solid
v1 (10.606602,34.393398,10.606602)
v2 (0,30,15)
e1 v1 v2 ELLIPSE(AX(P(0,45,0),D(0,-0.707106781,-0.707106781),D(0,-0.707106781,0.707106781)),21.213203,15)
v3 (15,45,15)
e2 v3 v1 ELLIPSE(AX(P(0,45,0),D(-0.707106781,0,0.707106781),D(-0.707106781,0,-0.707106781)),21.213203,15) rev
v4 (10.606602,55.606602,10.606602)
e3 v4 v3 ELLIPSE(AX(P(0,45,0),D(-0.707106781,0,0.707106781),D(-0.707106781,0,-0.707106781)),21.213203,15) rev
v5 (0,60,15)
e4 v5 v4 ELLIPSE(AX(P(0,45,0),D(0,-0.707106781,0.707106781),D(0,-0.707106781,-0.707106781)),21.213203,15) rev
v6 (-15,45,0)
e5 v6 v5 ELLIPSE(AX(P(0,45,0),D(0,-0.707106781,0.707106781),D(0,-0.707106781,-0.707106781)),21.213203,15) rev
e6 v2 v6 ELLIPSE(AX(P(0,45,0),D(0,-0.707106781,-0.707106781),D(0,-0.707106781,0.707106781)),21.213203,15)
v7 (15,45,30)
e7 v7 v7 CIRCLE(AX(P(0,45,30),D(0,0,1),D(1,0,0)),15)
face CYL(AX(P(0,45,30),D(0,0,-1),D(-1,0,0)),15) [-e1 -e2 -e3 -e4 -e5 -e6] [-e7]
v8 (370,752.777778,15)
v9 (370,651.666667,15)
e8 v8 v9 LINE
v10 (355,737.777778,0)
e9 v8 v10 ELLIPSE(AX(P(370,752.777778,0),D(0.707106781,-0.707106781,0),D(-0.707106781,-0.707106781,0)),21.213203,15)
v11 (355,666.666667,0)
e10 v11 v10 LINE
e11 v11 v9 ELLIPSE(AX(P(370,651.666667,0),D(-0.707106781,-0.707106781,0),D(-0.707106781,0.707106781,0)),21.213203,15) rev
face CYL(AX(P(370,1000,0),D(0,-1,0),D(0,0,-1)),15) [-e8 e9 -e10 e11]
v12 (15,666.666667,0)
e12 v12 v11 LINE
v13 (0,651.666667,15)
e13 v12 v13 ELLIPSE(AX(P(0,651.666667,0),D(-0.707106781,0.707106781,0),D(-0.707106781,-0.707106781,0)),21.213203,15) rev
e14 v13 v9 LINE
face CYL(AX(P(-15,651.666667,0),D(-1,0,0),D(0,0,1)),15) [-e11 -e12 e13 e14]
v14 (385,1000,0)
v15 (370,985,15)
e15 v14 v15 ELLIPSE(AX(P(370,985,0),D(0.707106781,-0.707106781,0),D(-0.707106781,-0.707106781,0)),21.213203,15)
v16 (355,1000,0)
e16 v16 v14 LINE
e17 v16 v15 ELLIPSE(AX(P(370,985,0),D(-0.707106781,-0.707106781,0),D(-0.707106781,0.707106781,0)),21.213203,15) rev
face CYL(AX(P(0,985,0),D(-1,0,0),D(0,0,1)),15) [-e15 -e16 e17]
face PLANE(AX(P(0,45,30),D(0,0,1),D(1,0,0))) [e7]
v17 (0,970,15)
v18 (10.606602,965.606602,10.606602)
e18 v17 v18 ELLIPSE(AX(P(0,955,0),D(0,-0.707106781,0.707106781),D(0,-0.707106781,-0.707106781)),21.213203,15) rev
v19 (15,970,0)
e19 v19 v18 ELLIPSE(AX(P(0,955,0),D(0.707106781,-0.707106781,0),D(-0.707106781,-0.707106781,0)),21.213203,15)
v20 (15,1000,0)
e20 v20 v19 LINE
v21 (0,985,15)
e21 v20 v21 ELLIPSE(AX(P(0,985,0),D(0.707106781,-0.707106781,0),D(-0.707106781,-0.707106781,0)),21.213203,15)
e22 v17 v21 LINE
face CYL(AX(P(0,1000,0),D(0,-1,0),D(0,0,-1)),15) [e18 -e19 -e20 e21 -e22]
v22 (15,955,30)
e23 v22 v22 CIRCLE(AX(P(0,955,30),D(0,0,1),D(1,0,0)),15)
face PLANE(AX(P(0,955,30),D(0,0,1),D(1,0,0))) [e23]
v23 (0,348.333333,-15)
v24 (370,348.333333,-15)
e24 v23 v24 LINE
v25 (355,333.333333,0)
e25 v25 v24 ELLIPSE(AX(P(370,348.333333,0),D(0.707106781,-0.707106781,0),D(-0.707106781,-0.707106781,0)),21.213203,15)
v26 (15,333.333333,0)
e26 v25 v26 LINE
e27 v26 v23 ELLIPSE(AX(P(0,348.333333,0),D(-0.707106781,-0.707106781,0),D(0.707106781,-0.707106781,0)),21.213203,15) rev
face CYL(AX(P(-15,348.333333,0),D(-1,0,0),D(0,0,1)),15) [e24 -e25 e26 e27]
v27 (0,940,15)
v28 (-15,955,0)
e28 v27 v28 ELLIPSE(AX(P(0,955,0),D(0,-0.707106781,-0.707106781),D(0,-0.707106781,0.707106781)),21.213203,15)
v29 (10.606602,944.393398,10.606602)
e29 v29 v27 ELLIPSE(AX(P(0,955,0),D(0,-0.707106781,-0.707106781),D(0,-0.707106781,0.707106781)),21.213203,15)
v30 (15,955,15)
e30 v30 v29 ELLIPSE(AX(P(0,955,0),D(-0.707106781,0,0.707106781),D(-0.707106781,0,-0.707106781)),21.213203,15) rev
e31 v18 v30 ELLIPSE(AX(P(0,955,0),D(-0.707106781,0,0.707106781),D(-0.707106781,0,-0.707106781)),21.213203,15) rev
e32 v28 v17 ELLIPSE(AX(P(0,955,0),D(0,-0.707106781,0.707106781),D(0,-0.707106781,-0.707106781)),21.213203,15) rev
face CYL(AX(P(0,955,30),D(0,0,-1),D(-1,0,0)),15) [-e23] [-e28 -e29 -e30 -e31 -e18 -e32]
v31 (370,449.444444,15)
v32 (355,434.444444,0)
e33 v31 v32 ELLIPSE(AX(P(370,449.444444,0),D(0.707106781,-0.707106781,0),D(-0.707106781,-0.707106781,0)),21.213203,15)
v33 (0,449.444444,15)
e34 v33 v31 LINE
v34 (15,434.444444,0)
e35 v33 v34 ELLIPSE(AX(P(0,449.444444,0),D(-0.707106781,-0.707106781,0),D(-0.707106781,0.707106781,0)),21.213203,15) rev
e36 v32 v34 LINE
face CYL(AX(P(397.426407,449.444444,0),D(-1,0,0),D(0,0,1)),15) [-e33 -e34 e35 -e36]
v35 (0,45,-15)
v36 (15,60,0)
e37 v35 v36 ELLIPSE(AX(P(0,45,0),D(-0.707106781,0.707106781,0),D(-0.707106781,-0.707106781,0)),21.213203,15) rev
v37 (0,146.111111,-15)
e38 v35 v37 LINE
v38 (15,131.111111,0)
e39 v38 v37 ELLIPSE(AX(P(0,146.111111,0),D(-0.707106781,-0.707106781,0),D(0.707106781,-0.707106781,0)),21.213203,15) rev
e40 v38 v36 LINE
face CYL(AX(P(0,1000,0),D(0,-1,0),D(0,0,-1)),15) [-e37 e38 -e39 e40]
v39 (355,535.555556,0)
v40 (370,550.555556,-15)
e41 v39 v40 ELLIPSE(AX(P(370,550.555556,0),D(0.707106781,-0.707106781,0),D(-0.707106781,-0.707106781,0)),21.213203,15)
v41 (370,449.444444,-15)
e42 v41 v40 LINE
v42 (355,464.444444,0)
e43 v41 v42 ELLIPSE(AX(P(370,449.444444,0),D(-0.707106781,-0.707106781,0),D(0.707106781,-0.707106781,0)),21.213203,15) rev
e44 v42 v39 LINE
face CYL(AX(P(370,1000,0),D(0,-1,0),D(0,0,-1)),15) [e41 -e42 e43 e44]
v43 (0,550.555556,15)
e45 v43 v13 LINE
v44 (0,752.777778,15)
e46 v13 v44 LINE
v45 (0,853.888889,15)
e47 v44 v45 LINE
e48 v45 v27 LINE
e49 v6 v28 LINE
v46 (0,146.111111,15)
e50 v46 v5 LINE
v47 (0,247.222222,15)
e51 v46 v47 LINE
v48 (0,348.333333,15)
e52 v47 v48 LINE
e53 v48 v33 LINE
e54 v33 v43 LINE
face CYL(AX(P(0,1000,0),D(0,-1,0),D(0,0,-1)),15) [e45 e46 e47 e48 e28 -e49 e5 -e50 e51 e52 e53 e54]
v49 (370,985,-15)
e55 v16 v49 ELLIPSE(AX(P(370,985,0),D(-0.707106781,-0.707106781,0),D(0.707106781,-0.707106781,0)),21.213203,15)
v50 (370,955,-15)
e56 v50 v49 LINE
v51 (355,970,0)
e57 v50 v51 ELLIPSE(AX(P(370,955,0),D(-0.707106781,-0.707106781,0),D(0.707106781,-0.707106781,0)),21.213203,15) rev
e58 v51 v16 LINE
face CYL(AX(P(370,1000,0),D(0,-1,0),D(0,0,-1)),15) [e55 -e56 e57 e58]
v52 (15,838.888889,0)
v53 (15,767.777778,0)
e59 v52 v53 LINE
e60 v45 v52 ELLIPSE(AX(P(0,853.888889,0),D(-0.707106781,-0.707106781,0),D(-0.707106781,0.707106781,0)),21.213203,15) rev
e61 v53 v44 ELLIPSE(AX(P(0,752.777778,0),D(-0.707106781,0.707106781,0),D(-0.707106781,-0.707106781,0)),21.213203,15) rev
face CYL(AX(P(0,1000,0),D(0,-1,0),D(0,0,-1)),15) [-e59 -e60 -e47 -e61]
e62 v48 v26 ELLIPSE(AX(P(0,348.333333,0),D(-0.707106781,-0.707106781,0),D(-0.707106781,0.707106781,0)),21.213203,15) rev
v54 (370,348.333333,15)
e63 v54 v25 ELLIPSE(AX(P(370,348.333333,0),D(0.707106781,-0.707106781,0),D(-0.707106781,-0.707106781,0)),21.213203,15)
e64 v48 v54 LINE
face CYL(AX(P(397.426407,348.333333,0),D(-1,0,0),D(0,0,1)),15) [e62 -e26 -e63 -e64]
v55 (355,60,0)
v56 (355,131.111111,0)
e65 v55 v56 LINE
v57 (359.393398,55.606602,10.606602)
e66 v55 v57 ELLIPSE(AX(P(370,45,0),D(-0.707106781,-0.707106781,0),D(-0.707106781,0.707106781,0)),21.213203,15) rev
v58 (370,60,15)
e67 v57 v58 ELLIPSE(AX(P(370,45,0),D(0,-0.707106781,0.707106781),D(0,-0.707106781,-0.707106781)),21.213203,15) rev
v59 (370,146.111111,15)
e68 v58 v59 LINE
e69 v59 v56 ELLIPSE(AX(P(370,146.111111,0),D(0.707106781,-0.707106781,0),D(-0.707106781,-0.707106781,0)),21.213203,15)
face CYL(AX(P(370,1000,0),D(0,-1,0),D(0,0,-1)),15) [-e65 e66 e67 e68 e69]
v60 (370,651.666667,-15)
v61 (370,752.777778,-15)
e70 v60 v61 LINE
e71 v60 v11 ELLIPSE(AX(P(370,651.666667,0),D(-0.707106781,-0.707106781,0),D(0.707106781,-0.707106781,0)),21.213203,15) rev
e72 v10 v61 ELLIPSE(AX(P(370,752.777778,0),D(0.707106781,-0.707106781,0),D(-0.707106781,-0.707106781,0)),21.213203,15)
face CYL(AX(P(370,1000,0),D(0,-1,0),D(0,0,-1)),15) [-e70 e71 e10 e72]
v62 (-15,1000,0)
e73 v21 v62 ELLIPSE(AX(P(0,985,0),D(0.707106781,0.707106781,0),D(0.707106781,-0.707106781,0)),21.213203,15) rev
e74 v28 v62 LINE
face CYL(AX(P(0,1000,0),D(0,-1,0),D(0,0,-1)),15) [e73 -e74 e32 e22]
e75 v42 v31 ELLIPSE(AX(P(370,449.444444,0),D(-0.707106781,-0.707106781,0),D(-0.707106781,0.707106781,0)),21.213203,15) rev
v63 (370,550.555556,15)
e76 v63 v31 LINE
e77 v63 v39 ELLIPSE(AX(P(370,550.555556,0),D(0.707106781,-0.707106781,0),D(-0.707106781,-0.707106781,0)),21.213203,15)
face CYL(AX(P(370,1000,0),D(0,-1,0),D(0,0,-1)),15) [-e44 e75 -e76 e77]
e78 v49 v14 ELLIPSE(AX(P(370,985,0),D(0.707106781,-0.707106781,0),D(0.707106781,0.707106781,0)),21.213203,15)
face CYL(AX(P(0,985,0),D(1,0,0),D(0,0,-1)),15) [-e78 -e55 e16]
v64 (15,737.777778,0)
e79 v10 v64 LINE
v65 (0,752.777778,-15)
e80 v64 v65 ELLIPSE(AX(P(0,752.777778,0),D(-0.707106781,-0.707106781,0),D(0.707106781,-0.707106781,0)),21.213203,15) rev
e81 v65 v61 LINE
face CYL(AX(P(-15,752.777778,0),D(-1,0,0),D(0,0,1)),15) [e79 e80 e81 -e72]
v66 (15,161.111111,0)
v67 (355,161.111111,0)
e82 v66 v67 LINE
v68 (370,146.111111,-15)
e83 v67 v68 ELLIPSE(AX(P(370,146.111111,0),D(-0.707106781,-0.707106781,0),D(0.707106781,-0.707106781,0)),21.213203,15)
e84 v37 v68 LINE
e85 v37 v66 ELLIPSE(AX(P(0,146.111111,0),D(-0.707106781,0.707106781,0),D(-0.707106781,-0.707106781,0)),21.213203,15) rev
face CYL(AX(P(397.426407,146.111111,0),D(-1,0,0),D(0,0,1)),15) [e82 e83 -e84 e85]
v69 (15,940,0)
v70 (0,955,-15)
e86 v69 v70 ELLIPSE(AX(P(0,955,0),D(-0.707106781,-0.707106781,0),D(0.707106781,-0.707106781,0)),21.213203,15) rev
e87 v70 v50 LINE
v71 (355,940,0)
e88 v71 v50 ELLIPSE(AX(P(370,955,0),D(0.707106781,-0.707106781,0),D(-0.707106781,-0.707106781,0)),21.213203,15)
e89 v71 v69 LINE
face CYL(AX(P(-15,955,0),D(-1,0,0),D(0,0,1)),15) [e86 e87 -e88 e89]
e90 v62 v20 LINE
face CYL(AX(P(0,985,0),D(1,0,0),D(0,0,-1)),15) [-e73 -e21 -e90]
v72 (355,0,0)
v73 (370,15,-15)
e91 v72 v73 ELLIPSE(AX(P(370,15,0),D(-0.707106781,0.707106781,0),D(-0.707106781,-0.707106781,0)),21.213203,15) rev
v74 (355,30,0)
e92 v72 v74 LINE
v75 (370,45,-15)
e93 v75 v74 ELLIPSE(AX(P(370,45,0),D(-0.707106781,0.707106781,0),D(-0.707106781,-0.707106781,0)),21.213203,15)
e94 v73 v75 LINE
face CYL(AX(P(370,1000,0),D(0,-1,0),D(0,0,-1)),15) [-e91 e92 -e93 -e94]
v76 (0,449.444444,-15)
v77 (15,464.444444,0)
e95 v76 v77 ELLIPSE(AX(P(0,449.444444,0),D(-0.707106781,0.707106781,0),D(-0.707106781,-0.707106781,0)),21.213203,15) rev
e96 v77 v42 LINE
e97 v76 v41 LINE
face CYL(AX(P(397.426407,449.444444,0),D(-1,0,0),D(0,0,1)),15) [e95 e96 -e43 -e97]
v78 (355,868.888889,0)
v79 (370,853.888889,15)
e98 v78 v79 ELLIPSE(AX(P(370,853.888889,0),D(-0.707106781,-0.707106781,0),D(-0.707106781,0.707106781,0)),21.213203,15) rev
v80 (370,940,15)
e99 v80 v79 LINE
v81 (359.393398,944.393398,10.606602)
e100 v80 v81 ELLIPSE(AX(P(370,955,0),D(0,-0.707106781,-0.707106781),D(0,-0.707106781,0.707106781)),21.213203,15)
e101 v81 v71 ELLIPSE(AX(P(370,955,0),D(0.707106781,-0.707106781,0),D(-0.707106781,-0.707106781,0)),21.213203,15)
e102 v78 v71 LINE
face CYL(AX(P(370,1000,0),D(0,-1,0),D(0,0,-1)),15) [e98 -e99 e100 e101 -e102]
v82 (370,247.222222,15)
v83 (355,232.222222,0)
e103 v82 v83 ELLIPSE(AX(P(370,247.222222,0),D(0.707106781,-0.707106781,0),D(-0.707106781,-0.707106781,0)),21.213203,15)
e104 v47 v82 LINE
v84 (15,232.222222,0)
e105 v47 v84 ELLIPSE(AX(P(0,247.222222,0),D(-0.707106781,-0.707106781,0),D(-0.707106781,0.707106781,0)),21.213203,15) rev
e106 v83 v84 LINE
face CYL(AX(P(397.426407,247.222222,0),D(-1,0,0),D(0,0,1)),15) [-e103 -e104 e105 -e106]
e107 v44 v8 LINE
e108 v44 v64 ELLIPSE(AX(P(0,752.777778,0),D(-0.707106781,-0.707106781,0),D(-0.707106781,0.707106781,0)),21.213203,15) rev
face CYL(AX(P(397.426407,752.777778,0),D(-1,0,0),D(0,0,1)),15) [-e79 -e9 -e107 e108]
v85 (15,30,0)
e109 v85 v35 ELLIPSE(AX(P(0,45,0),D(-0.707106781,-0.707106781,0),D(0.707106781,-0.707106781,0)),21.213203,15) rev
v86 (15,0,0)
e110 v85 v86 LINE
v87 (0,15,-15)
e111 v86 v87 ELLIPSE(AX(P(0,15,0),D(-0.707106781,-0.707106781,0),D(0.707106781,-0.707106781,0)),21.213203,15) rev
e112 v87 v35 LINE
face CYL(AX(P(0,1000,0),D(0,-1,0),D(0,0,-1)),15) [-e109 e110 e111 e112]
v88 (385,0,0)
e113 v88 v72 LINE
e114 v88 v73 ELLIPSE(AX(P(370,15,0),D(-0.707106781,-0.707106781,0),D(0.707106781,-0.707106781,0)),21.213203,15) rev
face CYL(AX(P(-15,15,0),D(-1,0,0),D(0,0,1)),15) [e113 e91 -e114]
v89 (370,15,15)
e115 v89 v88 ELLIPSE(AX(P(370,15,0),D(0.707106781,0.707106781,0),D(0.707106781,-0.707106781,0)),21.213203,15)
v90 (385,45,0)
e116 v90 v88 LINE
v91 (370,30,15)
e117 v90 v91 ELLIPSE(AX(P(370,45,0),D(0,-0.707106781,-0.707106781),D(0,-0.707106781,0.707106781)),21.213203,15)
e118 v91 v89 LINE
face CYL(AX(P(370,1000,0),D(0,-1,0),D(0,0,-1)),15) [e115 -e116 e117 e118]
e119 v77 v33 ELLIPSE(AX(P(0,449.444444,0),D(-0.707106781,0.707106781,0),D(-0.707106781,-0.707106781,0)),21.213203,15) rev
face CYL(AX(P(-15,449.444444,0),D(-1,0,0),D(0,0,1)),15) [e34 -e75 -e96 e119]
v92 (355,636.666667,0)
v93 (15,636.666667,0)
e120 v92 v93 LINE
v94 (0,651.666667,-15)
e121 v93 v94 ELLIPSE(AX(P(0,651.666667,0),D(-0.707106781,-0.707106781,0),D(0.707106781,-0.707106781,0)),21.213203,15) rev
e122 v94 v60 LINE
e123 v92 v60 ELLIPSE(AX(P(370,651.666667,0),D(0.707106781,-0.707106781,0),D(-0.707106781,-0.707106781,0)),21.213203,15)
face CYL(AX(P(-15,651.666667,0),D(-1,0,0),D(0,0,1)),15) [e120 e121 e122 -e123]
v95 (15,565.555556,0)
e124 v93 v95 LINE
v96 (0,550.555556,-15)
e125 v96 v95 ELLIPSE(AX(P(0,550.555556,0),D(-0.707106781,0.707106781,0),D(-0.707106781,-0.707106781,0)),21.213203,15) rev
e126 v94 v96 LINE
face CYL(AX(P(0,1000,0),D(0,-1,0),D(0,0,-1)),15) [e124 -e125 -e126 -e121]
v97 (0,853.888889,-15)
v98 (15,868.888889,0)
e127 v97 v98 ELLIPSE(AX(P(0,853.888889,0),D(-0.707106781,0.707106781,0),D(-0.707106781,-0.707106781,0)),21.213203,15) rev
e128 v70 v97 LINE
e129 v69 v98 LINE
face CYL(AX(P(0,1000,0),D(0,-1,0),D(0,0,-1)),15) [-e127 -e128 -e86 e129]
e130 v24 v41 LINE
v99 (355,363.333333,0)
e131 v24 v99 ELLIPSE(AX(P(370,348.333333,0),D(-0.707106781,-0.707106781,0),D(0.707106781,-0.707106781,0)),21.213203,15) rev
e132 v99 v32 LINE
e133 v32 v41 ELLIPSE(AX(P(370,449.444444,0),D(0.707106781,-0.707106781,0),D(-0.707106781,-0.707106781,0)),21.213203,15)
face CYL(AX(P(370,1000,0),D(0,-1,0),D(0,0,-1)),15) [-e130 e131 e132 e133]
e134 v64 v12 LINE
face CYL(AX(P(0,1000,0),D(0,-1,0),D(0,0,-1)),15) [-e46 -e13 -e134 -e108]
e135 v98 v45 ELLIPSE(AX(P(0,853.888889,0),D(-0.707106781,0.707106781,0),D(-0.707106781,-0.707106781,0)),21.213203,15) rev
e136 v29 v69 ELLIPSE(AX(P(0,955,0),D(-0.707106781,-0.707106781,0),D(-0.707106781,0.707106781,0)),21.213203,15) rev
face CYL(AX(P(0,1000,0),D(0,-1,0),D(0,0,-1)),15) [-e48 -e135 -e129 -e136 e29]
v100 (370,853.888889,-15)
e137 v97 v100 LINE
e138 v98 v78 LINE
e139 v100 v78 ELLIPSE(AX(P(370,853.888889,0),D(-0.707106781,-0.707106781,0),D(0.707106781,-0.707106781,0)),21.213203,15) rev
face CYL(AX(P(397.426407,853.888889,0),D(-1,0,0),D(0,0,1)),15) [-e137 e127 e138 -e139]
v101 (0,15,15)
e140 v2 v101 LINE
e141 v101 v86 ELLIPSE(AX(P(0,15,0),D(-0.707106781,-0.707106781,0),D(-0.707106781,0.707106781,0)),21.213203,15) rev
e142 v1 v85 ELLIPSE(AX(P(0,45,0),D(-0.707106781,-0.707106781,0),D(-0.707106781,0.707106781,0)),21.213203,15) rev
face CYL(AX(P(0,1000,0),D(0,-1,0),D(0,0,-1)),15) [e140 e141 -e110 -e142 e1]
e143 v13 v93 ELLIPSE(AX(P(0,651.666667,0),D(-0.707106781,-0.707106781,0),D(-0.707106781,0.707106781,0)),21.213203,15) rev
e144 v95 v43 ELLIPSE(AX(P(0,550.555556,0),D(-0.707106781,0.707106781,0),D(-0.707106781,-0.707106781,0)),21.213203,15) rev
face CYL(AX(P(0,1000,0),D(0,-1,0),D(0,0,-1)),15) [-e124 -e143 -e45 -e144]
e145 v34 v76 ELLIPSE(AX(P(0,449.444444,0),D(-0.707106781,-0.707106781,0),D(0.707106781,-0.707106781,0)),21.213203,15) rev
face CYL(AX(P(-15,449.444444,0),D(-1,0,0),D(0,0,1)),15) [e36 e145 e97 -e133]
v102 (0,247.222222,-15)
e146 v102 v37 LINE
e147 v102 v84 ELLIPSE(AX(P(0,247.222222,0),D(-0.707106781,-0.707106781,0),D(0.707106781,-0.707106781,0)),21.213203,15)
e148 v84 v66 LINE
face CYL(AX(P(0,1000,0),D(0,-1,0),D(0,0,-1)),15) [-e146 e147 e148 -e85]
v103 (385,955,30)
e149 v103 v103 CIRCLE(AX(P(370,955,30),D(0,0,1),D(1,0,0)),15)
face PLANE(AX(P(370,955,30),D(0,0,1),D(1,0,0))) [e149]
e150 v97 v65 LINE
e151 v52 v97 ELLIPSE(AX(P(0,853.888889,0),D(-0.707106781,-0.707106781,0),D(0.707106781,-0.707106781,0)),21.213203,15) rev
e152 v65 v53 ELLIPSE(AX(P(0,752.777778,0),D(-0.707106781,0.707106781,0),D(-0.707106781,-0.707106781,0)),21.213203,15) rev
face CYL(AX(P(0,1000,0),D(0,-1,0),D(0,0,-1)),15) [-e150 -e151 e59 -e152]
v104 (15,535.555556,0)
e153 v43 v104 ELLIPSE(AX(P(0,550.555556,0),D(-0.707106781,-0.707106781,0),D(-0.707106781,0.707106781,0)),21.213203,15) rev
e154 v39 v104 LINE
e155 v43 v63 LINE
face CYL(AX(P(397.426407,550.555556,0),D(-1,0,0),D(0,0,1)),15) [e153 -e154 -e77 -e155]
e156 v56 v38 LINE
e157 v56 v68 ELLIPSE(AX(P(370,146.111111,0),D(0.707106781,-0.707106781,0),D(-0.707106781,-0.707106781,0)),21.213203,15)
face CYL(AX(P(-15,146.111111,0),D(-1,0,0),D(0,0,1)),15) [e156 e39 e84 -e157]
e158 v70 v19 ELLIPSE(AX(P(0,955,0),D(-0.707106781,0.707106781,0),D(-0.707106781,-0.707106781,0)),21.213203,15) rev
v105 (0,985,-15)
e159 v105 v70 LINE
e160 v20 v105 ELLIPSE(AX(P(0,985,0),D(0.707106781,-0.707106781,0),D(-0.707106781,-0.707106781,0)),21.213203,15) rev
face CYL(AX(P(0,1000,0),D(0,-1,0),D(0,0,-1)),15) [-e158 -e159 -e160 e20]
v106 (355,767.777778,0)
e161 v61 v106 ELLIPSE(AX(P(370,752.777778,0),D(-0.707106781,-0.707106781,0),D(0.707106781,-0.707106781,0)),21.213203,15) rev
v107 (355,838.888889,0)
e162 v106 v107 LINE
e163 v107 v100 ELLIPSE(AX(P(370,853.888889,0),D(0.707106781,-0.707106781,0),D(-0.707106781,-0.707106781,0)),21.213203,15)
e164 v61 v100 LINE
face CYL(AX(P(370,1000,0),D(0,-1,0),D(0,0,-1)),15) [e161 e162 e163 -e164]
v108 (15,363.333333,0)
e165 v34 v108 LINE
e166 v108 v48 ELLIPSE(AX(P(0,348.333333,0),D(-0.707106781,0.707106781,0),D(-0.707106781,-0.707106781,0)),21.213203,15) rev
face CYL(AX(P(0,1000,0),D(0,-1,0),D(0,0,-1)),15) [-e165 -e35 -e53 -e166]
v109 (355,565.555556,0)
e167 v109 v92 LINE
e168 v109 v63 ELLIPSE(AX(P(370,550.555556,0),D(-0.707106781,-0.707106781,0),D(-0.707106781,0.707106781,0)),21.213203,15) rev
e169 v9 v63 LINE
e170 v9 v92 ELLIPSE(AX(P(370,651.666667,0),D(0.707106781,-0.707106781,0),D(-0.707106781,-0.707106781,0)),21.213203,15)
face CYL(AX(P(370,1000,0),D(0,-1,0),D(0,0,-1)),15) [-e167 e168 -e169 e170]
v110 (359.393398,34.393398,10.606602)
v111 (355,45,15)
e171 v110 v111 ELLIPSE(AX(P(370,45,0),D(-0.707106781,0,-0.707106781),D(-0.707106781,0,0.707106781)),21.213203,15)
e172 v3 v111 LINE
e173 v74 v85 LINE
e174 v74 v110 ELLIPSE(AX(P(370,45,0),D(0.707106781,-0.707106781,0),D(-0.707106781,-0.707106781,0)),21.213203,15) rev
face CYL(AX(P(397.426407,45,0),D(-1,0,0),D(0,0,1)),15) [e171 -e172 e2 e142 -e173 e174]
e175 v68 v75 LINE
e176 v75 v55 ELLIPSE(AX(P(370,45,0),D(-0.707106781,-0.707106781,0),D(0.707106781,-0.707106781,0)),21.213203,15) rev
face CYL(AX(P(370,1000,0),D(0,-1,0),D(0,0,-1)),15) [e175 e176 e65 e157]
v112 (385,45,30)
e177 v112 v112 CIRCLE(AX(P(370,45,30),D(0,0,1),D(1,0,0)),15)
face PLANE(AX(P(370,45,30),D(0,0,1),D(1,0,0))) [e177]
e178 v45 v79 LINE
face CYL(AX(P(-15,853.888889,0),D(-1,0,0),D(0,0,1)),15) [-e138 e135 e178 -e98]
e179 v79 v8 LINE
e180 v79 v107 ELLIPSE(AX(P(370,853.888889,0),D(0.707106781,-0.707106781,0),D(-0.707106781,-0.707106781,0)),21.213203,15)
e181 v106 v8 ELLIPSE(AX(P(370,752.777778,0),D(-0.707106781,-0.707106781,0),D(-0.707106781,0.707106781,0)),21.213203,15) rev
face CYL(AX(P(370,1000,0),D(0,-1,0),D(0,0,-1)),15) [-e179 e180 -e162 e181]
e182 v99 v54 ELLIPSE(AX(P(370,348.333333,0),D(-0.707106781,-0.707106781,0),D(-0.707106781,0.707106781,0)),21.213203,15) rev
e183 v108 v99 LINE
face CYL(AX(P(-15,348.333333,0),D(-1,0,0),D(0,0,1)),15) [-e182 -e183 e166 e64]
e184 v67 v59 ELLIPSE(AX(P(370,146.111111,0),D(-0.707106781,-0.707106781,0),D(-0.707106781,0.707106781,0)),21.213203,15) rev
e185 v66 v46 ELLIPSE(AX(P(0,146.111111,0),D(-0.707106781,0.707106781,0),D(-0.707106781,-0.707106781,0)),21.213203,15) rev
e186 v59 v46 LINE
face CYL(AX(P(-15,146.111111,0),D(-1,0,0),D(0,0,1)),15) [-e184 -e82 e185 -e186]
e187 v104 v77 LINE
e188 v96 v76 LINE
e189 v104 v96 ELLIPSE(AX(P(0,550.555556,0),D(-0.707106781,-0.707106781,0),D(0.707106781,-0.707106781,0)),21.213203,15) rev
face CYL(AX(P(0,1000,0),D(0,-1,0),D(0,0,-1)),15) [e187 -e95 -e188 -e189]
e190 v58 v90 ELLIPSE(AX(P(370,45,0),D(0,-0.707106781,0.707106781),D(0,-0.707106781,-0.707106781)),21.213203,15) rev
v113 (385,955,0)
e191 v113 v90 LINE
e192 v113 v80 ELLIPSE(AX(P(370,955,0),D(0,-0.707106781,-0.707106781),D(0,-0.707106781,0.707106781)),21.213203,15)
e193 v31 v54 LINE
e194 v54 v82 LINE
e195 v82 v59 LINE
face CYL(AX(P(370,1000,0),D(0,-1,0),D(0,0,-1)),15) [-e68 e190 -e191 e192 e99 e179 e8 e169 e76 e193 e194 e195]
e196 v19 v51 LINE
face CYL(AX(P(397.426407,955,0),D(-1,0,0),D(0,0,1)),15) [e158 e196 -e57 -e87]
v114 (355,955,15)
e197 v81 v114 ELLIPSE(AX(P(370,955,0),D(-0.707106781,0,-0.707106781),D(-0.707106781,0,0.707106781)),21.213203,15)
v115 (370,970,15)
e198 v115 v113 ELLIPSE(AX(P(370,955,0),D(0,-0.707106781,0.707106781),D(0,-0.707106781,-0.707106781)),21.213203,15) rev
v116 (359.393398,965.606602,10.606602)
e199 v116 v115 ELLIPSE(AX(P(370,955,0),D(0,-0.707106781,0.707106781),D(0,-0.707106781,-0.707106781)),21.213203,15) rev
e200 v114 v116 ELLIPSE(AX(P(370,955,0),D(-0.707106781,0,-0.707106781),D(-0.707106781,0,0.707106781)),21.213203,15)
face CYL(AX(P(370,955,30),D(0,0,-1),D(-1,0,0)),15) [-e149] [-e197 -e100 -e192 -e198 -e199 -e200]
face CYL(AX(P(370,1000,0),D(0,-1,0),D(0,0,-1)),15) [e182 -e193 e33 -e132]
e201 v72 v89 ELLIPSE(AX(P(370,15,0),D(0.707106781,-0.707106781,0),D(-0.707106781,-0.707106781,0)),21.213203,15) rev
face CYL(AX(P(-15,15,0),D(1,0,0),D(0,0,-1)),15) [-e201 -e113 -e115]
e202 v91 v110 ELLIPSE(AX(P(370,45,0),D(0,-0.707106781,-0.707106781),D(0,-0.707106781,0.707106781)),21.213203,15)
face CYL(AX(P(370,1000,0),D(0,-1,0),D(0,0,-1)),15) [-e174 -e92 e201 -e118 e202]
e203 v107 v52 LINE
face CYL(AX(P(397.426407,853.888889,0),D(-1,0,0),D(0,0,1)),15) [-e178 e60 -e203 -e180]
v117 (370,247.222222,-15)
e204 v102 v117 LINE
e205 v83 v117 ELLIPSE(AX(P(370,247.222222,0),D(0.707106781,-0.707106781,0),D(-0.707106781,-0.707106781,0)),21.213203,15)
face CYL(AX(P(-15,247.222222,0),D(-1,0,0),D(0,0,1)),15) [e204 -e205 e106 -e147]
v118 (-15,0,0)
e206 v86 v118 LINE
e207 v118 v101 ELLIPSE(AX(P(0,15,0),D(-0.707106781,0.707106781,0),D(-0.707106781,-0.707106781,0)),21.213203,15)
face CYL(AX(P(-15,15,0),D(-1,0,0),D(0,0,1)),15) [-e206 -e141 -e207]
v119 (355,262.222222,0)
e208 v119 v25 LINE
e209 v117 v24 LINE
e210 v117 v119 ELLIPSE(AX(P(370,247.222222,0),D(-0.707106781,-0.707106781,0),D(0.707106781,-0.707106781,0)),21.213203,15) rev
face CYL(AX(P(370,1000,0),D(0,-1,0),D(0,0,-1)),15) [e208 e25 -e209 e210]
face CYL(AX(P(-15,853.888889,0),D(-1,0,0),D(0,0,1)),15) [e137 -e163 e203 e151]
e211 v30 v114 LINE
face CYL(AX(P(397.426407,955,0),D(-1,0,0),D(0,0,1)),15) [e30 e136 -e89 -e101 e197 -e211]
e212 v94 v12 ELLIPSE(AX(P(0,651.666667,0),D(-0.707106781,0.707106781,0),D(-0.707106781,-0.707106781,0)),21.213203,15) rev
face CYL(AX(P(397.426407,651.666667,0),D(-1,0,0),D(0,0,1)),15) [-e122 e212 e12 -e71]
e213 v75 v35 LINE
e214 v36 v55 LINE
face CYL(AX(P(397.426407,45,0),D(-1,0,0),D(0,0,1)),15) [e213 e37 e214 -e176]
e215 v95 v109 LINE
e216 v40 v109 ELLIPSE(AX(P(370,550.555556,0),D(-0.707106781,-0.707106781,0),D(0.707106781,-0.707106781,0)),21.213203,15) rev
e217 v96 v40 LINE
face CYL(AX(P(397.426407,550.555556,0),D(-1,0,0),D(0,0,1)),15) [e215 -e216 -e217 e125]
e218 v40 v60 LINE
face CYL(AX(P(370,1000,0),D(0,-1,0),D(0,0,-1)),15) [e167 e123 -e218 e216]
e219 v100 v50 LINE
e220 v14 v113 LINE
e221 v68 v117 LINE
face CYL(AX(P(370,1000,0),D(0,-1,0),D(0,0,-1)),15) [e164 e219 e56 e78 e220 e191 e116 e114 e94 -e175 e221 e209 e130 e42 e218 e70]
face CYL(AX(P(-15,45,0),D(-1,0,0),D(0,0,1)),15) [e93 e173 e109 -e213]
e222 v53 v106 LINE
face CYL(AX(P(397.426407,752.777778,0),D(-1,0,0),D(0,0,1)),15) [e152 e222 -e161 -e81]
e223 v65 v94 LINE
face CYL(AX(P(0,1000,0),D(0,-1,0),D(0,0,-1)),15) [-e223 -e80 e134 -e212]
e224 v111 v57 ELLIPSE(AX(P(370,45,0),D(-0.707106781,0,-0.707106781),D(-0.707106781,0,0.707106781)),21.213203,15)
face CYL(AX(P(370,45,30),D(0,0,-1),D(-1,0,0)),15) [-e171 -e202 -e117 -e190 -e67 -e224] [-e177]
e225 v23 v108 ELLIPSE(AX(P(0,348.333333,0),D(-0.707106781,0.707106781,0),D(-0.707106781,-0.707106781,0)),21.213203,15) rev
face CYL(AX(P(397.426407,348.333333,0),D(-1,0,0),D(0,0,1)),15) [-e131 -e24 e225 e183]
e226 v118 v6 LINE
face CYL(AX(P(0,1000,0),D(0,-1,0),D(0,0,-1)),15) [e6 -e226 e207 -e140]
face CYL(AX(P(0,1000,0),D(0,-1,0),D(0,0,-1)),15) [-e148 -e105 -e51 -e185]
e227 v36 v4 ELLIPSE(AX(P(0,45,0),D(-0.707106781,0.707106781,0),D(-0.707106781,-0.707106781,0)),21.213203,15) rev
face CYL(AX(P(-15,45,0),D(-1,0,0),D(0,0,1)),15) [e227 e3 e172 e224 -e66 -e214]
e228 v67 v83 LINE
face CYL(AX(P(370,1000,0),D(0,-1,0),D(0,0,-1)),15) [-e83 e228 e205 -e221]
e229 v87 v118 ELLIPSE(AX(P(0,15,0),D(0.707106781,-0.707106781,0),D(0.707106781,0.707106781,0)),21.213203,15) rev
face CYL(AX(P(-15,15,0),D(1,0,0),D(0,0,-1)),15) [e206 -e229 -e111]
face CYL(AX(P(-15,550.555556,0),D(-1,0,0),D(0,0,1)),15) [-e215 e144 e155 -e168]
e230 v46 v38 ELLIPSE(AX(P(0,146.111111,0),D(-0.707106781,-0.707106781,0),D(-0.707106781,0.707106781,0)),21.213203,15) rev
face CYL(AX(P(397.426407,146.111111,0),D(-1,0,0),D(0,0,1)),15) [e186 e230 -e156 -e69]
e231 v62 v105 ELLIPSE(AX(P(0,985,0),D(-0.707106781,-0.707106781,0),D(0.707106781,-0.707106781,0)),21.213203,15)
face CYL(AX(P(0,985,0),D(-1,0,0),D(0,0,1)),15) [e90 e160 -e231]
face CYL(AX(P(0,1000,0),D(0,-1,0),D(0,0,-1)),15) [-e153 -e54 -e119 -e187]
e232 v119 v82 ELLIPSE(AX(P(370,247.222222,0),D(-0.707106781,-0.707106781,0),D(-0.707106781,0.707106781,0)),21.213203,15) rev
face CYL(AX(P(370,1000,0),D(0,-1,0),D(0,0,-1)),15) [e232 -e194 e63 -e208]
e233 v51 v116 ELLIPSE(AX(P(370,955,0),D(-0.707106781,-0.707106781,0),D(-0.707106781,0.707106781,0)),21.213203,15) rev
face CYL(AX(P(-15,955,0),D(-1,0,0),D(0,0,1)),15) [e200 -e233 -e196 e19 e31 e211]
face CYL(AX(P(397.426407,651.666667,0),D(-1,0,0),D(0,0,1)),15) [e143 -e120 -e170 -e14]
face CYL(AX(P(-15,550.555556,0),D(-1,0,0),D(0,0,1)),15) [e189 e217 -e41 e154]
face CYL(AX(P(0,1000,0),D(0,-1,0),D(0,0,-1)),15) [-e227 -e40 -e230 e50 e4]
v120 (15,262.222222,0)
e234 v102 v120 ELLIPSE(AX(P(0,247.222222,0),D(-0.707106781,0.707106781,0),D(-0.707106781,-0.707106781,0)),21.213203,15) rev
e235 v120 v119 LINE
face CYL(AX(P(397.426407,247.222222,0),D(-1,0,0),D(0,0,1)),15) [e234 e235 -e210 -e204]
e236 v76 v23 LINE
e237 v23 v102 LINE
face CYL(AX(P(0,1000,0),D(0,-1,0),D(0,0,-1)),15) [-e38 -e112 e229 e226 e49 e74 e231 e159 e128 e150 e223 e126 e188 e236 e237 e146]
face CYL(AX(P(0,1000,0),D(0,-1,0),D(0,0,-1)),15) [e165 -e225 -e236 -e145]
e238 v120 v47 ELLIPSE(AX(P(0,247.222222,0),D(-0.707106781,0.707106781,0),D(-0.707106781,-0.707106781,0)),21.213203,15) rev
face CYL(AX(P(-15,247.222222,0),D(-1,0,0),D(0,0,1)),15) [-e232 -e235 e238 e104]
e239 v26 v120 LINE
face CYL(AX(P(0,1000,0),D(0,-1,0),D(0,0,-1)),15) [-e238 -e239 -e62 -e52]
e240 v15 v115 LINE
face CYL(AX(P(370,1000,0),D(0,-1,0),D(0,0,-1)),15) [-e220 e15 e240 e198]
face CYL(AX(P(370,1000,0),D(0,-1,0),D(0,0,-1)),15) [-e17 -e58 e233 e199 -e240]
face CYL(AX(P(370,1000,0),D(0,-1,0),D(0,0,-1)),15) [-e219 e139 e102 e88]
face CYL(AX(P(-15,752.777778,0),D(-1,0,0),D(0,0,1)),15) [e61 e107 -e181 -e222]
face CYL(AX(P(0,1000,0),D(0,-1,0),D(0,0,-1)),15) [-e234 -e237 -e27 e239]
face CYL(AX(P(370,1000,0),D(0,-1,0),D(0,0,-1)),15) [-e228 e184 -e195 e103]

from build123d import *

# Parameters (mm, degrees)
SKETCH_2_W             = 30
SKETCH_2_H             = 30
EXTRUDE_1_DEPTH        = 1000
EXTRUDE_1_2_DEPTH      = 1000
SKETCH_3_W             = 30
SKETCH_3_H             = 30
EXTRUDE_2_DEPTH        = 340
PATTERN_LINEAR_1_COUNT = 10
PATTERN_LINEAR_1_PITCH = 101.111111111
FILLET_1_R             = 15
SKETCH_4_R             = 15
EXTRUDE_3_DEPTH        = 30


with BuildPart() as part:
    # Эскиз2 → Бобышка-Вытянуть1 (new body)
    with BuildSketch(Plane(origin=(0, 0, 0), x_dir=(1, 0, 0), z_dir=(0, 1, 0))):
        Rectangle(SKETCH_2_W, SKETCH_2_H)
    extrude(amount=EXTRUDE_1_DEPTH)



with BuildPart() as body_2:
    # Эскиз2 → Extrude 1 2 (new body)
    with BuildSketch(Plane(origin=(0, 0, 0), x_dir=(1, 0, 0), z_dir=(0, 1, 0))):
        with Locations((370, 0)):
            Rectangle(SKETCH_2_W, SKETCH_2_H)
    extrude(amount=EXTRUDE_1_2_DEPTH)


with BuildPart() as part_1:
    add(part.part)

    add(body_2.part)  # Бобышка-Вытянуть2 merges body 2
    # Эскиз3 → Бобышка-Вытянуть2 (add)
    with BuildSketch(Plane(origin=(15, 0, 0), x_dir=(0, 0, -1), z_dir=(1, 0, 0))):
        with Locations((0, 45)):
            Rectangle(SKETCH_3_W, SKETCH_3_H)
    extrude_2 = extrude(amount=EXTRUDE_2_DEPTH)

    # Линейный массив1: Бобышка-Вытянуть2 ×10
    with Locations(*[(0, i * PATTERN_LINEAR_1_PITCH, 0) for i in range(1, PATTERN_LINEAR_1_COUNT)]):
        add(extrude_2)

    # Скругление1
    fillet_1_edges = [part_1.edges().sort_by_distance(p)[0] for p in [
        (355, 95.555555556, -15),
        (185, 60, -15),
        (15, 95.555555556, -15),
        (185, 131.111111111, 15),
        (185, 131.111111111, -15),
        (355, 196.666666667, -15),
        (185, 161.111111111, -15),
        (185, 161.111111111, 15),
        (15, 196.666666667, -15),
        (185, 232.222222222, 15),
        (185, 232.222222222, -15),
        (355, 297.777777778, -15),
        (185, 262.222222222, -15),
        (185, 262.222222222, 15),
        (15, 297.777777778, -15),
        (185, 333.333333333, 15),
        (185, 333.333333333, -15),
        (355, 398.888888889, -15),
        (185, 363.333333333, -15),
        (185, 363.333333333, 15),
        (15, 398.888888889, -15),
        (185, 434.444444444, 15),
        (185, 434.444444444, -15),
        (355, 500, -15),
        (185, 464.444444444, -15),
        (185, 464.444444444, 15),
        (15, 500, -15),
        (185, 535.555555556, 15),
        (185, 535.555555556, -15),
        (355, 601.111111111, -15),
        (185, 565.555555556, -15),
        (185, 565.555555556, 15),
        (15, 601.111111111, -15),
        (185, 636.666666667, 15),
        (185, 636.666666667, -15),
        (355, 702.222222222, -15),
        (185, 666.666666667, -15),
        (185, 666.666666667, 15),
        (15, 702.222222222, -15),
        (185, 737.777777778, 15),
        (185, 737.777777778, -15),
        (355, 803.333333333, -15),
        (185, 767.777777778, -15),
        (185, 767.777777778, 15),
        (15, 803.333333333, -15),
        (185, 838.888888889, 15),
        (185, 838.888888889, -15),
        (355, 904.444444444, -15),
        (185, 868.888888889, -15),
        (185, 868.888888889, 15),
        (15, 904.444444444, -15),
        (185, 940, 15),
        (185, 940, -15),
        (0, 1000, -15),
        (-15, 500, -15),
        (0, 0, -15),
        (15, 15, -15),
        (185, 30, -15),
        (355, 15, -15),
        (370, 0, -15),
        (385, 500, -15),
        (370, 1000, -15),
        (355, 985, -15),
        (185, 970, -15),
        (185, 970, 15),
        (15, 985, -15),
        (-15, 500, 15),
        (0, 1000, 15),
        (15, 985, 15),
        (355, 985, 15),
        (370, 1000, 15),
        (385, 500, 15),
        (370, 0, 15),
        (355, 15, 15),
        (185, 30, 15),
        (15, 15, 15),
        (0, 0, 15),
        (185, 60, 15),
        (355, 95.555555556, 15),
        (15, 95.555555556, 15),
        (355, 196.666666667, 15),
        (15, 196.666666667, 15),
        (355, 297.777777778, 15),
        (15, 297.777777778, 15),
        (355, 398.888888889, 15),
        (15, 398.888888889, 15),
        (355, 500, 15),
        (15, 500, 15),
        (355, 601.111111111, 15),
        (15, 601.111111111, 15),
        (355, 702.222222222, 15),
        (15, 702.222222222, 15),
        (355, 803.333333333, 15),
        (15, 803.333333333, 15),
        (355, 904.444444444, 15),
        (15, 904.444444444, 15),
    ]]
    fillet(fillet_1_edges, radius=FILLET_1_R - 0.0001)  # a hair under: the kernel refuses the full size

    # Эскиз4 → Бобышка-Вытянуть3 (add)
    with BuildSketch(Plane.XY):
        with Locations((0, 955)):
            Circle(SKETCH_4_R)
        with Locations((370, 955)):
            Circle(SKETCH_4_R)
        with Locations((370, 45)):
            Circle(SKETCH_4_R)
        with Locations((0, 45)):
            Circle(SKETCH_4_R)
    extrude(amount=EXTRUDE_3_DEPTH)


solid = part_1.part
